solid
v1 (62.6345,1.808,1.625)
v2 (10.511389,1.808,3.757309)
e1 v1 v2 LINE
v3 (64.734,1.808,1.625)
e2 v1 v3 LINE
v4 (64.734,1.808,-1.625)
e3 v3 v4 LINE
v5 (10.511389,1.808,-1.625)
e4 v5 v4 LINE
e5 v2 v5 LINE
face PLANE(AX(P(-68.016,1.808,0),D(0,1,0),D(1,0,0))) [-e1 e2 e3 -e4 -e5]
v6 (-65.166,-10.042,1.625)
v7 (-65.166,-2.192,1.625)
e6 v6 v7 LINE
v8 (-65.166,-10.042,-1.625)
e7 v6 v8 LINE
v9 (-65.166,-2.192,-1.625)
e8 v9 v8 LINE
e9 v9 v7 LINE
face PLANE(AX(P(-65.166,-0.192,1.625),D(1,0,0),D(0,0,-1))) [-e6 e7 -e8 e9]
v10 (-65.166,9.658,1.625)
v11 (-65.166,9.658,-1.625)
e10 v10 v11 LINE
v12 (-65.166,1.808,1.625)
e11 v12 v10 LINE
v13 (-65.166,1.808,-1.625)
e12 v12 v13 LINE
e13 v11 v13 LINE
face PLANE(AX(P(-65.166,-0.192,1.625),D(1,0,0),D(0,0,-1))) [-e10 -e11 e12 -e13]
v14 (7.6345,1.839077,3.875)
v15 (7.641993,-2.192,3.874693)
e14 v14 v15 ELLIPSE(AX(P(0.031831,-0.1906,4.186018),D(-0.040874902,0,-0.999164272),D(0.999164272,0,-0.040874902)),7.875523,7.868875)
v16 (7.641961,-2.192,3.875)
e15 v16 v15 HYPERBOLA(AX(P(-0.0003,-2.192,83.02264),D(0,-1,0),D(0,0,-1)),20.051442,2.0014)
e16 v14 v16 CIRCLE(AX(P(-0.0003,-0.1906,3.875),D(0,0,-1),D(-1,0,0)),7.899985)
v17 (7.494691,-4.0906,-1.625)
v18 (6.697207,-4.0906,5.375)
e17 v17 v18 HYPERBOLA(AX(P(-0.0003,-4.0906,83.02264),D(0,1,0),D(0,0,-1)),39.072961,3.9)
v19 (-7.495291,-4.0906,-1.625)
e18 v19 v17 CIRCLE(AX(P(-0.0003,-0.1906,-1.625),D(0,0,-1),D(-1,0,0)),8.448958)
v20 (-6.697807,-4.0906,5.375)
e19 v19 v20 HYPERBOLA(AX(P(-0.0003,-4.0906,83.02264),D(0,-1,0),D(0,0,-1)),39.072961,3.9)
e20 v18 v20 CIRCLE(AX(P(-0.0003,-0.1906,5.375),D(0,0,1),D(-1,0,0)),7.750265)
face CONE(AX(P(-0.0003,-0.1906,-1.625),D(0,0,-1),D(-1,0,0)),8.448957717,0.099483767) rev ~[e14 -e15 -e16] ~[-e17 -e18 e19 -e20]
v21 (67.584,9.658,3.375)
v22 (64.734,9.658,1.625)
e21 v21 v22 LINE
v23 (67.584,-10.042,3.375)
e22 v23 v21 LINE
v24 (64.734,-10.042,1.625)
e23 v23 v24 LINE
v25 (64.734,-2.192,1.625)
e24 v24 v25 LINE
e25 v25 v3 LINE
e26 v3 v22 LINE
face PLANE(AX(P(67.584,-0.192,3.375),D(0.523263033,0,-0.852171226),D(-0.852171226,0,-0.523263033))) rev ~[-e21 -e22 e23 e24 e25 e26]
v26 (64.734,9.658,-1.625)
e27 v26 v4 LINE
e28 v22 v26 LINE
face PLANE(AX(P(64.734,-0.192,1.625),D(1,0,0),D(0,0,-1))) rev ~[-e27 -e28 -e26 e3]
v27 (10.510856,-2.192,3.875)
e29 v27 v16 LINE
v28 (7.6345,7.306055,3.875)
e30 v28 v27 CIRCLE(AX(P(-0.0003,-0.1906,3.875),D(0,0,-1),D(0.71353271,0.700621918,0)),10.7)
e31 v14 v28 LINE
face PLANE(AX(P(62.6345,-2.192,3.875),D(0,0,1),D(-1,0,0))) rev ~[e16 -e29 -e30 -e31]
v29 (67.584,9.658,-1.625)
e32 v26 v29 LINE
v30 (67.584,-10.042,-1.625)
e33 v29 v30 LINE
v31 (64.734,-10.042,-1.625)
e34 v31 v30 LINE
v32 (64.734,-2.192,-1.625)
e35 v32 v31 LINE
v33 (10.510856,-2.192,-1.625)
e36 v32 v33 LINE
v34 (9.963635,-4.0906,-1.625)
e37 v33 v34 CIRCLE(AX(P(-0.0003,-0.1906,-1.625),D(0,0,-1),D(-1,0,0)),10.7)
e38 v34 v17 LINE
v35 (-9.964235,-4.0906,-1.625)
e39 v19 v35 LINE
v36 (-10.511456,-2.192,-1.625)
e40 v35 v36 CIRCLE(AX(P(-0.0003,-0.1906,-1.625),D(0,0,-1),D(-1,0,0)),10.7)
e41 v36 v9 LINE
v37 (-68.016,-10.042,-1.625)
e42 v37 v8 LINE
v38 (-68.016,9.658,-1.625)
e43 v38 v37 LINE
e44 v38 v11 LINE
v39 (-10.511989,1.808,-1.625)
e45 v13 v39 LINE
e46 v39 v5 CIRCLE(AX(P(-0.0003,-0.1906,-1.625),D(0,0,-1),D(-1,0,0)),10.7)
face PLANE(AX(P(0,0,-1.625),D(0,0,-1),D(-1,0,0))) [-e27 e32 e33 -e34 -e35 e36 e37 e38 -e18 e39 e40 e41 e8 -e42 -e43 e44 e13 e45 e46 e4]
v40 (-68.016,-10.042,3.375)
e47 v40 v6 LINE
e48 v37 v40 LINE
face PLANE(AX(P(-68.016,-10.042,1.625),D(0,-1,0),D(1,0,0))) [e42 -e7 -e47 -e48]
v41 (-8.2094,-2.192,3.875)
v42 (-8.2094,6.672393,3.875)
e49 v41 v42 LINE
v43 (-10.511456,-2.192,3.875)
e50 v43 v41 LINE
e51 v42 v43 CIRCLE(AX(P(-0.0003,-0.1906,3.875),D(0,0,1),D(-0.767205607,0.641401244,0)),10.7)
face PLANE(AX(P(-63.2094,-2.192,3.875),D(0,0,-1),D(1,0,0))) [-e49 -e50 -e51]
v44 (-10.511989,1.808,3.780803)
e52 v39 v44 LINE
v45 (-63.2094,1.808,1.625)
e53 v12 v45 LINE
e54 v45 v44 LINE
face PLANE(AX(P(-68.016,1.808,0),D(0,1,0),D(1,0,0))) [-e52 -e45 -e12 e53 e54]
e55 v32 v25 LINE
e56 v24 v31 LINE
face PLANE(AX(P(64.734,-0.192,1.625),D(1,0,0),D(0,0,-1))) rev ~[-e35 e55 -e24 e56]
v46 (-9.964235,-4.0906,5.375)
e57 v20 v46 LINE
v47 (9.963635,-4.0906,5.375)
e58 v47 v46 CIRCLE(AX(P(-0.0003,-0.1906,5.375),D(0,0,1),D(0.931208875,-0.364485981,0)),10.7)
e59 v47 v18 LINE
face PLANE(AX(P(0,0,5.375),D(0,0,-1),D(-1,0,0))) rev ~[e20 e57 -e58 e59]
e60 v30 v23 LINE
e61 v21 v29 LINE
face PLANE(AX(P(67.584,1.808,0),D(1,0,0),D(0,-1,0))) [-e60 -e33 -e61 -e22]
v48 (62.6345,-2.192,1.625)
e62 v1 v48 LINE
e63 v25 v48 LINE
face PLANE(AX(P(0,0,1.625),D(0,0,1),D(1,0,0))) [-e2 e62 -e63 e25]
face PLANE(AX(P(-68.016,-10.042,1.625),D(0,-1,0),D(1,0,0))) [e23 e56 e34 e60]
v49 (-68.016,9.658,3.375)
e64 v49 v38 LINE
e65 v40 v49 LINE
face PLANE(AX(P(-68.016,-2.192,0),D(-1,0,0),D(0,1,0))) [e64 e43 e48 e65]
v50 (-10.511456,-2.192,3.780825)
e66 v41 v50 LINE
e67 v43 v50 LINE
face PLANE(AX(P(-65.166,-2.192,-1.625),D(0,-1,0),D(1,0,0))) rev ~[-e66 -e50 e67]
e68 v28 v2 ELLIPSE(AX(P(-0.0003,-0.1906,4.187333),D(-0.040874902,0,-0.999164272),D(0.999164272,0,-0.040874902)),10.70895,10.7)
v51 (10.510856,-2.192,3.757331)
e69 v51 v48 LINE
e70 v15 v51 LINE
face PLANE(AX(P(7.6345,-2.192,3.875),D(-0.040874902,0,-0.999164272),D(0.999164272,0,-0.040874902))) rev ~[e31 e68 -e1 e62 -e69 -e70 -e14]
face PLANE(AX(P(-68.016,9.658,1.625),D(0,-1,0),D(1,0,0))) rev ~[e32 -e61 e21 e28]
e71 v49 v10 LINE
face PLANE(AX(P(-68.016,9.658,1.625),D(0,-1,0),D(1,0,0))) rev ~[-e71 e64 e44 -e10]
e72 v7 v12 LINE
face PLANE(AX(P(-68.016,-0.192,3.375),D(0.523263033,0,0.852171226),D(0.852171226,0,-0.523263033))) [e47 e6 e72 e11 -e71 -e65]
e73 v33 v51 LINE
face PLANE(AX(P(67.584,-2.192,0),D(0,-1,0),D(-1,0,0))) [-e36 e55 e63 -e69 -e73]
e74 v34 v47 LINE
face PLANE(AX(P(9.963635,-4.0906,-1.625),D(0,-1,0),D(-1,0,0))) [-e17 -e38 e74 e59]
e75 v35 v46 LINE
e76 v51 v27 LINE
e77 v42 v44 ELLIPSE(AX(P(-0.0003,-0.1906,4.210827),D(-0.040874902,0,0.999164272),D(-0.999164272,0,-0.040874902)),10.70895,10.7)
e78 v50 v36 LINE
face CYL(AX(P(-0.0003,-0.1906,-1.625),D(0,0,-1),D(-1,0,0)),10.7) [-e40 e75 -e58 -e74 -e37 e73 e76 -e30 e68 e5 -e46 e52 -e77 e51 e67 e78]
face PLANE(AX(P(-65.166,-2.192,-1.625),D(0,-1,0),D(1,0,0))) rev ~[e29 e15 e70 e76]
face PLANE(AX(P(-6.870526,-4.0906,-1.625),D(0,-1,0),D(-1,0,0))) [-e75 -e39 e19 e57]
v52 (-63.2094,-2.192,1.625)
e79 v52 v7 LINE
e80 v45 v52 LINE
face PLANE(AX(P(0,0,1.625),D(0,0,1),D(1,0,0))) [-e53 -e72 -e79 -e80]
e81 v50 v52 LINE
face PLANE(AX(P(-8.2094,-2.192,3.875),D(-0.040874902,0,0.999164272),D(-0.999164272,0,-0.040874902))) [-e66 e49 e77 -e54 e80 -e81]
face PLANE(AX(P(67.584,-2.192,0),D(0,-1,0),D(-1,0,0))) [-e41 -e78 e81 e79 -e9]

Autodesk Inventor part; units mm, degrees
ref_plane "YZ Plane" through (0, 0, 0) normal (1, 0, 0) x (0, 1, 0)
ref_plane "XZ Plane" through (0, 0, 0) normal (0, 1, 0) x (-1, 0, 0)
ref_plane "XY Plane" through (0, 0, 0) normal (0, 0, 1) x (1, 0, 0)
sketch "Skizze1" plane through (0, 0, 0) normal (0, 0, 1) x (1, 0, 0)
  line L0 (-68.016, 1.808) -> (67.584, 1.808)
  line L1 (67.584, 1.808) -> (67.584, -2.192)
  line L2 (67.584, -2.192) -> (-68.016, -2.192)
  line L3 (-68.016, -2.192) -> (-68.016, 1.808)
  line L4 (-68.016, 1.808) -> (67.584, -2.192) construction
  line L5 (67.584, 1.808) -> (-68.016, -2.192) construction
  point P0 (0, 0)
  point P1 (-0.216, -0.192)
  point P2 (-0.216, -0.192)
  dimension "d0" = 135.6
  dimension "d1" = 4
extrude "Extrusion1" add sketch "Skizze1" along normal mid plane 3.25
ref_plane "Arbeitsebene1" through (-68.016, -0.192, 1.625) normal (0, -1, 0) x (1, 0, 0)
sketch "Skizze2" plane through (-68.016, -0.192, 1.625) normal (0, -1, 0) x (1, 0, 0)
  line L0 (0, -3.25) -> (0, 0) projected
  line L1 (0, -3.25) -> (135.6, -3.25) projected
  line L2 (0, 0) -> (2.85, 0)
  line L3 (2.85, 0) -> (2.85, -3.25)
  line L4 (2.85, -3.25) -> (0, -3.25)
  line L5 (0, -3.25) -> (0, 0)
  line L6 (0, 0) -> (0, 1.75)
  line L7 (0, 1.75) -> (2.85, 0)
  line L8 (135.6, -3.25) -> (135.6, 0) projected
  line L9 (135.6, 0) -> (132.75, 0)
  line L10 (132.75, 0) -> (132.75, -3.25)
  line L11 (132.75, -3.25) -> (135.6, -3.25)
  line L12 (135.6, -3.25) -> (135.6, 0)
  line L13 (135.6, 0) -> (135.6, 1.75)
  line L14 (135.6, 1.75) -> (132.75, 0)
  point P0 (68.016, -1.625)
  dimension "d4" = 2.85
  dimension "d5" = 1.75
  dimension "d6" = 2.85
extrude "Extrusion2" add sketch "Skizze2" along normal mid plane 19.7
sketch "Skizze3" plane through (0, 0, 1.625) normal (0, 0, 1) x (1, 0, 0)
  circle A0 centre (0, 0) radius 9.95
  dimension "d9" = 19.9
extrude "Extrusion3" cut sketch "Skizze3" against normal through all
sketch "Skizze4" plane through (0, 0, -1.625) normal (0, 0, -1) x (-1, 0, 0)
  line L0 (0.0981, 0.0423) -> (6.2481, 0.0423) construction
  circle A0 centre (0.0003, -0.1906) radius 7.9
  circle A1 centre (0.0003, -0.1906) radius 10.7
  line L1 (-24.5997, -4.0906) -> (24.6003, -4.0906)
  point P0 (-11.2287, 0.0116)
  point P1 (11.2713, 0.0116)
  point P2 (0.0213, -0.1938)
  point P3 (6.8705, -4.0906)
  point P4 (9.9642, -4.0906)
  point P5 (-9.9636, -4.0906)
  point P6 (-6.8699, -4.0906)
  dimension "d27" = 2.8
  dimension "d28" = 15.8
  dimension "d29" = 3.9
extrude "Extrusion4" add sketch "Skizze4" against normal blind 7 contours A0 L1 A1 picked at (9.6695, 0.6375)
sketch "Skizze5" plane through (0, 0, 1.625) normal (0, 0, 1) x (1, 0, 0)
  line L0 (-10.512, 1.808) -> (-65.166, 1.808) projected
  line L1 (-10.5115, -2.192) -> (-65.166, -2.192) projected
  line L2 (-10.2094, 1.808) -> (-63.2094, 1.808)
  line L3 (-63.2094, 1.808) -> (-63.2094, -2.192)
  line L4 (-63.2094, -2.192) -> (-10.2094, -2.192)
  line L5 (-10.2094, -2.192) -> (-10.2094, 1.808)
  line L6 (10.5109, -2.192) -> (64.734, -2.192) projected
  line L7 (9.6345, 1.808) -> (62.6345, 1.808)
  line L8 (62.6345, 1.808) -> (62.6345, -2.192)
  line L9 (62.6345, -2.192) -> (9.6345, -2.192)
  line L10 (9.6345, -2.192) -> (9.6345, 1.808)
  point P0 (0, 0)
  point P1 (-8.6889, 1.808)
  point P2 (-8.6001, -2.192)
  point P3 (8.6889, 1.808)
  point P4 (8.6001, -2.192)
  point P5 (8.251, -2.192)
  point P6 (-13.2094, -2.192)
  point P7 (-63.2094, 1.808)
  point P8 (62.6345, -2.192)
  point P9 (-7.3561, 1.808)
  point P10 (-7.2509, -2.192)
  point P11 (7.2509, -2.192)
  dimension "d17" = 53
  dimension "d18" = 53
extrude "Extrusion5" add sketch "Skizze5" along normal blind 2.25
sketch "Skizze6" plane through (-65.166, -2.192, -1.625) normal (0, -1, 0) x (1, 0, 0)
  line L0 (1.9566, 5.5) -> (54.6545, 5.5) projected
  line L1 (1.9566, 5.5) -> (56.9566, 5.5)
  line L2 (56.9566, 5.5) -> (56.9566, 3.25)
  line L3 (56.9566, 3.25) -> (1.9566, 3.25)
  line L4 (1.9566, 3.25) -> (1.9566, 5.5)
  line L5 (56.9566, 5.5) -> (1.9566, 3.25)
  line L6 (127.8005, 3.25) -> (127.8005, 5.5) projected
  line L7 (127.8005, 5.5) -> (72.8005, 5.5)
  line L8 (72.8005, 5.5) -> (72.8005, 3.25)
  line L9 (72.8005, 3.25) -> (127.8005, 3.25)
  line L10 (127.8005, 3.25) -> (127.8005, 5.5)
  line L11 (72.8005, 5.5) -> (127.8005, 3.25)
  point P0 (65.166, 1.625)
  point P1 (56.5659, 5.5)
  point P2 (54.0951, 5.5)
  point P3 (56.5659, 5.5)
  point P4 (54.0951, 5.5)
  dimension "d21" = 55
  dimension "d22" = 2.25
  dimension "d23" = 55
  dimension "d26" = 2.25
extrude "Extrusion6" cut sketch "Skizze6" against normal through all contours L0 L1 L5 L4 | L11 L7 L6
draft "Flächenverjüngung2" angle 5.7 pull direction (0, 0, -1) faces at (7.1819, -3.4809, 2.5416) fixed edges at (7.642, -2.192, 3.8748) (7.8997, -0.176, 3.875)
properties part number "2024_08_28_Holder_NS14"
